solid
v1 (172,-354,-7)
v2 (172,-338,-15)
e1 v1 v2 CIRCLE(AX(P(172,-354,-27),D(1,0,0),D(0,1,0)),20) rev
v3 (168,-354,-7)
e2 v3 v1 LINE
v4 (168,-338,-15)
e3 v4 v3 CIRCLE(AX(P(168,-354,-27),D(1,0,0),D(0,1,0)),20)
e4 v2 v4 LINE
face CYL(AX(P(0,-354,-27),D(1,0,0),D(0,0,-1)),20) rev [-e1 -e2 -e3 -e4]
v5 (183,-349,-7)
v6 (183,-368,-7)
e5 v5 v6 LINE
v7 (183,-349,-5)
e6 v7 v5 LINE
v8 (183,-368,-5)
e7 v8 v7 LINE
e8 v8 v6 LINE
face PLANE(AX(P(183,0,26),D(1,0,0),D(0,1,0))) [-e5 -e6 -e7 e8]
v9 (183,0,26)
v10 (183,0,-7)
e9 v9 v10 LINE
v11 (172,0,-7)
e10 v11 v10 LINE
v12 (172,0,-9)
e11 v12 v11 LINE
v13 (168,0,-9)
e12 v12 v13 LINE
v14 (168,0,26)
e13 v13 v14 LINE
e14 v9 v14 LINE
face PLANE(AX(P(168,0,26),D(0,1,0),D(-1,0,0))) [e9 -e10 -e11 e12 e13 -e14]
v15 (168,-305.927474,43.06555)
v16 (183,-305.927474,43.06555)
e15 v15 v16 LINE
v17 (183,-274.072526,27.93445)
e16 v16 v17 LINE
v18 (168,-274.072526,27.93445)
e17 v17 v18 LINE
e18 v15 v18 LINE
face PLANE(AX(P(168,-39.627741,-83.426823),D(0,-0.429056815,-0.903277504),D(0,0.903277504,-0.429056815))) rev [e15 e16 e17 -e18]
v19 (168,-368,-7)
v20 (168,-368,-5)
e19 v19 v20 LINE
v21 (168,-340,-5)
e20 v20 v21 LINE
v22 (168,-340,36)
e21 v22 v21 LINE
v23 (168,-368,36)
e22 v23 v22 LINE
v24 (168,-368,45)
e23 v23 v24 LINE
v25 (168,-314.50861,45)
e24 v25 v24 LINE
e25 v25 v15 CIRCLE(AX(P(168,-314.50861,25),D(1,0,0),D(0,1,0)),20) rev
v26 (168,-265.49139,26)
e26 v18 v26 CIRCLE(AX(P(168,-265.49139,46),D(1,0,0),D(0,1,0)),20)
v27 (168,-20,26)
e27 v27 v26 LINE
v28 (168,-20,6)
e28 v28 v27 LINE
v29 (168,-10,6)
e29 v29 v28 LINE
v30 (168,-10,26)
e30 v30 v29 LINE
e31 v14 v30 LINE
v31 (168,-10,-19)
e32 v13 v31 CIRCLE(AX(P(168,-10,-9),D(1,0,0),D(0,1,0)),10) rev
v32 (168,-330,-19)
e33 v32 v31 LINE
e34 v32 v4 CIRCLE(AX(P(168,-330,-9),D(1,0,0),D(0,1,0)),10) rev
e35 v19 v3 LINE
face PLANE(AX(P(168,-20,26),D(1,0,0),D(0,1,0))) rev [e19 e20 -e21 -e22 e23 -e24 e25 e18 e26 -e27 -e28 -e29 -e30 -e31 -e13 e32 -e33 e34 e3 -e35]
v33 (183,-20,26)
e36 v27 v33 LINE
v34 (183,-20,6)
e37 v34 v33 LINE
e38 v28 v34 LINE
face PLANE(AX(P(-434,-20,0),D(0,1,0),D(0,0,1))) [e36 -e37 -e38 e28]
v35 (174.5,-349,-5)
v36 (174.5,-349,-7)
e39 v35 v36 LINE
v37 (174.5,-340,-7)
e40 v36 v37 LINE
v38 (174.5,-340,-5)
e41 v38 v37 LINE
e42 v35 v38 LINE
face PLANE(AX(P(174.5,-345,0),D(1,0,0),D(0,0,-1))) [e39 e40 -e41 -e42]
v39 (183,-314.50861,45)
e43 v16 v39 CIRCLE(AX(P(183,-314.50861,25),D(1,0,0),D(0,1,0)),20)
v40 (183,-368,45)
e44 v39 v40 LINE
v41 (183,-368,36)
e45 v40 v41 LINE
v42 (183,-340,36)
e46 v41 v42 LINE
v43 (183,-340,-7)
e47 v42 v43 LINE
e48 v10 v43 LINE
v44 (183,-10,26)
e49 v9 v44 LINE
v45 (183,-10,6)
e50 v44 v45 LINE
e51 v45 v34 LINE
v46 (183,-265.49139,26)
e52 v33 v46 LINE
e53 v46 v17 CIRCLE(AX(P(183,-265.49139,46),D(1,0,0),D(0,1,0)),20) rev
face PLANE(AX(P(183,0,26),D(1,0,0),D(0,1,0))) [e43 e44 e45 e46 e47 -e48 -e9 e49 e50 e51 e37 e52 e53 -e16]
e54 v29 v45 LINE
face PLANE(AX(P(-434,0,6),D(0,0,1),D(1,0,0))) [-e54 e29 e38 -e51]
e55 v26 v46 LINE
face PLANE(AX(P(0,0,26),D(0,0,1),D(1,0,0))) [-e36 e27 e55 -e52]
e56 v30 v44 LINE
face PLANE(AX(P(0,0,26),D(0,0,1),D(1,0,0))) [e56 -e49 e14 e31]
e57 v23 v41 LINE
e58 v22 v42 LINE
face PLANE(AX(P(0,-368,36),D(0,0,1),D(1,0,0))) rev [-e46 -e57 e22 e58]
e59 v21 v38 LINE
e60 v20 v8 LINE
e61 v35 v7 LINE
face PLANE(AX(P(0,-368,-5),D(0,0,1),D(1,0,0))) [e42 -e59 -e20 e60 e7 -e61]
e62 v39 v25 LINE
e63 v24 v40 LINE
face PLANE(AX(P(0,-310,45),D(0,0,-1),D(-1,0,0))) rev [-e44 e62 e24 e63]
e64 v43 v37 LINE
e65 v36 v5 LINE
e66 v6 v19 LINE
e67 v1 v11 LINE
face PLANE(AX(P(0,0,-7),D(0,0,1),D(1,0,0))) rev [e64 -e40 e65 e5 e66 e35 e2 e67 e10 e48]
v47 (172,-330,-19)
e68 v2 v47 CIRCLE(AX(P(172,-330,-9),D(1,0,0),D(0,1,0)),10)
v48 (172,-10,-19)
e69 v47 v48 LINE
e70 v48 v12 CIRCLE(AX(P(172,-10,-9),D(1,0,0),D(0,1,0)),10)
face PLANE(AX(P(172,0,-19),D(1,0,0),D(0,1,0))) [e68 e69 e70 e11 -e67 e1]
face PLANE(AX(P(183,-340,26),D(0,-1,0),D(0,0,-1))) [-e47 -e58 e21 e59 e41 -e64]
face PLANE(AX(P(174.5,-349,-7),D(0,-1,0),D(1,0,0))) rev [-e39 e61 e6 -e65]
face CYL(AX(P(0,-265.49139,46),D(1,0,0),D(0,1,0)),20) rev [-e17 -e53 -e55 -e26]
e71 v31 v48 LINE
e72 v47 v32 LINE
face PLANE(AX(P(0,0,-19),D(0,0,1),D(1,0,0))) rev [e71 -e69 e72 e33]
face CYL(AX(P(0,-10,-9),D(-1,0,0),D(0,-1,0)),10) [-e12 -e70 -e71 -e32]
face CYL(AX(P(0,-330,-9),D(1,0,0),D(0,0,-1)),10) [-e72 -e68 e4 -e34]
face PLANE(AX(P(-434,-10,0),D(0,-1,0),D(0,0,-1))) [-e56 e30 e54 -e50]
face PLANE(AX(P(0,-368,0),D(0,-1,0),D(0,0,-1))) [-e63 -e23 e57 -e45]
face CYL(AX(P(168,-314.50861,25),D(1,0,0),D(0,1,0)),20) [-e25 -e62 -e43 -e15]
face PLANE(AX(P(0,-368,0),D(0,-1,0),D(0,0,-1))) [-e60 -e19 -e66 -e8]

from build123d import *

# Parameters (mm, degrees)
EXTRUDE_1_DEPTH        = 26
EXTRUDE_2_DEPTH        = 19
FILLET_1_R             = 10
SKETCH_5_W             = 161
SKETCH_5_H             = 6
CUT_EXTRUDE_1_DEPTH    = 52
SKETCH_1_5_W           = 11
SKETCH_1_5_H           = 340
EXTRUDE_4_DEPTH        = 7
SKETCH_6_W             = 1.9
SKETCH_6_H             = 2
SKETCH_6_W_2           = 6.6
EXTRUDE_5_DEPTH        = 28
SKETCH_6_3_W           = 6.6
SKETCH_6_3_H           = 2
CUT_EXTRUDE_2_DEPTH    = 5
FILLET_2_R             = 20
SKETCH_6_4_W           = 15
SKETCH_6_4_H           = 10
SKETCH_6_4_H_2         = 9
EXTRUDE_6_DEPTH        = 30
SKETCH_6_5_W           = 15
SKETCH_6_5_H           = 9
EXTRUDE_7_DEPTH        = 28
EXTRUDE_8_DEPTH        = 15
FILLET_3_R             = 20
FILLET_3_OF_MIRROR_2_R = 20
FILLET_4_R             = 20
SKETCH_11_W            = 20
SKETCH_11_H            = 20
CUT_EXTRUDE_3_DEPTH    = 617
SKETCH_10_W            = 20
SKETCH_10_H            = 10
CUT_EXTRUDE_4_DEPTH    = 617
SKETCH_13_W            = 2
SKETCH_13_H            = 9
CUT_EXTRUDE_8_DEPTH    = 8.5


with BuildPart() as part:
    # 스케치1 → 보스-돌출1 (new body)
    with BuildSketch(Plane.XY):
        Polygon((-168, 0), (168, 0), (183, 0), (183, -340), (168, -340), (168, -20), (-168, -20), (-168, -340), (-183, -340), (-183, 0), align=None)
    extrude(amount=EXTRUDE_1_DEPTH)

    # 스케치1<4> → 보스-돌출2 (add)
    with BuildSketch(Plane.XY):
        Polygon((172, 0), (168, 0), (168, -20), (168, -340), (172, -340), align=None)
        Polygon((-168, -20), (-168, 0), (-172, 0), (-172, -340), (-168, -340), align=None)
    extrude(amount=-EXTRUDE_2_DEPTH)

    # 필렛1
    fillet_1_edges = [part.edges().sort_by_distance(p)[0] for p in [
        (170, 0, -19),
        (170, -340, -19),
        (-170, -340, -19),
        (-170, 0, -19),
    ]]
    fillet(fillet_1_edges, radius=FILLET_1_R)

    # 스케치5 → 컷-돌출1 (cut)
    with BuildSketch(Plane(origin=(0, 0, 0), x_dir=(1, 0, 0), z_dir=(0, 1, 0))):
        with Locations((-87.5, -3)):
            Rectangle(SKETCH_5_W, SKETCH_5_H)
        with Locations((87.5, -3)):
            Rectangle(SKETCH_5_W, SKETCH_5_H)
    extrude(amount=-CUT_EXTRUDE_1_DEPTH, mode=Mode.SUBTRACT)

    # 스케치1<5> → 보스-돌출4 (add)
    with BuildSketch(Plane.XY):
        with Locations((177.5, -170)):
            Rectangle(SKETCH_1_5_W, SKETCH_1_5_H)
        with Locations((-177.5, -170)):
            Rectangle(SKETCH_1_5_W, SKETCH_1_5_H)
    extrude(amount=-EXTRUDE_4_DEPTH)

    # 스케치6 → 보스-돌출5 (add)
    with BuildSketch(Plane.XZ.offset(340)):
        with Locations((-182.05, -6)):
            Rectangle(SKETCH_6_W, SKETCH_6_H)
        with Locations((-177.8, -6)):
            Rectangle(SKETCH_6_W_2, SKETCH_6_H)
        Polygon((-174.5, -7), (-172, -7), (-168, -7), (-168, -5), (-174.5, -5), align=None)
    extrude_5 = extrude(amount=EXTRUDE_5_DEPTH)

    # 스케치6<3> → 컷-돌출2 (cut)
    with BuildSketch(Plane.XZ.offset(340)):
        with Locations((-177.8, -6)):
            Rectangle(SKETCH_6_3_W, SKETCH_6_3_H)
    cut_extrude_2 = extrude(amount=CUT_EXTRUDE_2_DEPTH, mode=Mode.SUBTRACT)

    # 필렛2
    # the kernel refuses this fillet: 20 mm, written as the material it adds along each edge
    with BuildSketch(Plane(origin=(-172, -340, -7), x_dir=(0, -1, 0), z_dir=(1, 0, 0))) as fillet_2_piece_1:
        with BuildLine():
            CenterArc((14, 20), FILLET_2_R, 216.869897646, 53.130102354)
            Line((-2, 8), (-3.6, 6.8))
            ThreePointArc((-3.6, 6.8), (-2, 2), (-2, 0))
            Line((-2, 0), (0, -2))
            Line((0, -2), (14, -2))
            Line((14, -2), (14, 0))
        make_face()
    extrude(amount=4)

    # 스케치6<4> → 보스-돌출6 (add)
    with BuildSketch(Plane.XZ.offset(340)):
        with Locations((-175.5, 31)):
            Rectangle(SKETCH_6_4_W, SKETCH_6_4_H)
        with Locations((-175.5, 40.5)):
            Rectangle(SKETCH_6_4_W, SKETCH_6_4_H_2)
    extrude_6 = extrude(amount=-EXTRUDE_6_DEPTH)

    # 스케치6<5> → 보스-돌출7 (add)
    with BuildSketch(Plane.XZ.offset(340)):
        with Locations((-175.5, 40.5)):
            Rectangle(SKETCH_6_5_W, SKETCH_6_5_H)
    extrude_7 = extrude(amount=EXTRUDE_7_DEPTH)

    # 스케치9 → 보스-돌출8 (add)
    with BuildSketch(Plane.ZY.offset(183)):
        Polygon((26, -310), (45, -310), (26, -270), align=None)
    extrude_8 = extrude(amount=-EXTRUDE_8_DEPTH)

    # 필렛3
    fillet_3_edges = [part.edges().sort_by_distance(p)[0] for p in [
        (-175.5, -310, 45),
        (-175.5, -270, 26),
    ]]
    fillet(fillet_3_edges, radius=FILLET_3_R)

    # 대칭 복사2: 보스-돌출5, 컷-돌출2, 보스-돌출6, 보스-돌출7, 보스-돌출8 across plane
    add(extrude_5.mirror(Plane(origin=(0, 0, 0), x_dir=(0, 0, 1), z_dir=(1, 0, 0))))
    add(cut_extrude_2.mirror(Plane(origin=(0, 0, 0), x_dir=(0, 0, 1), z_dir=(1, 0, 0))), mode=Mode.SUBTRACT)
    add(extrude_6.mirror(Plane(origin=(0, 0, 0), x_dir=(0, 0, 1), z_dir=(1, 0, 0))))
    add(extrude_7.mirror(Plane(origin=(0, 0, 0), x_dir=(0, 0, 1), z_dir=(1, 0, 0))))
    add(extrude_8.mirror(Plane(origin=(0, 0, 0), x_dir=(0, 0, 1), z_dir=(1, 0, 0))))

    # 필렛3 of 대칭 복사2
    fillet_3_of_mirror_2_edges = [part.edges().sort_by_distance(p)[0] for p in [
        (175.5, -310, 45),
        (175.5, -270, 26),
    ]]
    fillet(fillet_3_of_mirror_2_edges, radius=FILLET_3_OF_MIRROR_2_R)

    # 필렛4
    # the kernel refuses this fillet: 20 mm, written as the material it adds along each edge
    with BuildSketch(Plane(origin=(172, -340, -7), x_dir=(0, 0.24253562503633938, -0.9701425001453302), z_dir=(-1, 0, 0))) as fillet_4_piece_1:
        with BuildLine():
            CenterArc((16.007351252, 18.432707503), FILLET_4_R, 194.036243468, 53.130102354)
            Line((-3.395498751, 13.581995002), (-5.335783751, 13.096923752))
            Line((-5.335783751, 13.096923752), (-1.940285, -0.48507125))
            Line((-1.940285, -0.48507125), (0.48507125, -1.940285))
            ThreePointArc((0.48507125, -1.940285), (2.42535625, -1.45521375), (7.470097251, -1.84327075))
            Line((7.470097251, -1.84327075), (8.246211251, 0))
        make_face()
    extrude(amount=4)

    # 스케치11 → 컷-돌출3 (cut)
    with BuildSketch(Plane.ZY.offset(-168)):
        with BuildLine():
            ThreePointArc((45, -314.508610159), (44.510394688, -310.110371974), (43.065550087, -305.927473868))
            Line((43.065550087, -305.927473868), (27.934449913, -274.072526132))
            ThreePointArc((27.934449913, -274.072526132), (26.489605312, -269.889628026), (26, -265.491389841))
            Line((26, -265.491389841), (26, -20))
            Line((26, -20), (6, -20))
            Line((6, -20), (6, 0))
            Line((6, 0), (-7, 0))
            Line((-7, 0), (-7, -354))
            Line((-7, -354), (-7, -368))
            Line((-7, -368), (-5, -368))
            Line((-5, -368), (-5, -340))
            Line((-5, -340), (36, -340))
            Line((36, -340), (36, -368))
            Line((36, -368), (45, -368))
            Line((45, -368), (45, -314.508610159))
        make_face()
        with Locations((16, -10)):
            Rectangle(SKETCH_11_W, SKETCH_11_H)
        with BuildLine():
            Line((-7, -354), (-7, 0))
            Line((-7, 0), (-9, 0))
            ThreePointArc((-9, 0), (-16.071067812, -2.928932188), (-19, -10))
            Line((-19, -10), (-19, -330))
            ThreePointArc((-19, -330), (-17.94427191, -334.472135955), (-15, -338))
            ThreePointArc((-15, -338), (-9.11145618, -345.05572809), (-7, -354))
        make_face()
    extrude(amount=CUT_EXTRUDE_3_DEPTH, mode=Mode.SUBTRACT)

    # 스케치10 → 컷-돌출4 (cut)
    with BuildSketch(Plane(origin=(183, 0, 0), x_dir=(0, 0, -1), z_dir=(1, 0, 0))):
        with Locations((-16, -15)):
            Rectangle(SKETCH_10_W, SKETCH_10_H)
    extrude(amount=-CUT_EXTRUDE_4_DEPTH, mode=Mode.SUBTRACT)

    # 스케치13 → 컷-돌출8 (cut)
    with BuildSketch(Plane(origin=(183, 0, 0), x_dir=(0, 0, -1), z_dir=(1, 0, 0))):
        with Locations((6, -344.5)):
            Rectangle(SKETCH_13_W, SKETCH_13_H)
    extrude(amount=-CUT_EXTRUDE_8_DEPTH, mode=Mode.SUBTRACT)


solid = part.part
